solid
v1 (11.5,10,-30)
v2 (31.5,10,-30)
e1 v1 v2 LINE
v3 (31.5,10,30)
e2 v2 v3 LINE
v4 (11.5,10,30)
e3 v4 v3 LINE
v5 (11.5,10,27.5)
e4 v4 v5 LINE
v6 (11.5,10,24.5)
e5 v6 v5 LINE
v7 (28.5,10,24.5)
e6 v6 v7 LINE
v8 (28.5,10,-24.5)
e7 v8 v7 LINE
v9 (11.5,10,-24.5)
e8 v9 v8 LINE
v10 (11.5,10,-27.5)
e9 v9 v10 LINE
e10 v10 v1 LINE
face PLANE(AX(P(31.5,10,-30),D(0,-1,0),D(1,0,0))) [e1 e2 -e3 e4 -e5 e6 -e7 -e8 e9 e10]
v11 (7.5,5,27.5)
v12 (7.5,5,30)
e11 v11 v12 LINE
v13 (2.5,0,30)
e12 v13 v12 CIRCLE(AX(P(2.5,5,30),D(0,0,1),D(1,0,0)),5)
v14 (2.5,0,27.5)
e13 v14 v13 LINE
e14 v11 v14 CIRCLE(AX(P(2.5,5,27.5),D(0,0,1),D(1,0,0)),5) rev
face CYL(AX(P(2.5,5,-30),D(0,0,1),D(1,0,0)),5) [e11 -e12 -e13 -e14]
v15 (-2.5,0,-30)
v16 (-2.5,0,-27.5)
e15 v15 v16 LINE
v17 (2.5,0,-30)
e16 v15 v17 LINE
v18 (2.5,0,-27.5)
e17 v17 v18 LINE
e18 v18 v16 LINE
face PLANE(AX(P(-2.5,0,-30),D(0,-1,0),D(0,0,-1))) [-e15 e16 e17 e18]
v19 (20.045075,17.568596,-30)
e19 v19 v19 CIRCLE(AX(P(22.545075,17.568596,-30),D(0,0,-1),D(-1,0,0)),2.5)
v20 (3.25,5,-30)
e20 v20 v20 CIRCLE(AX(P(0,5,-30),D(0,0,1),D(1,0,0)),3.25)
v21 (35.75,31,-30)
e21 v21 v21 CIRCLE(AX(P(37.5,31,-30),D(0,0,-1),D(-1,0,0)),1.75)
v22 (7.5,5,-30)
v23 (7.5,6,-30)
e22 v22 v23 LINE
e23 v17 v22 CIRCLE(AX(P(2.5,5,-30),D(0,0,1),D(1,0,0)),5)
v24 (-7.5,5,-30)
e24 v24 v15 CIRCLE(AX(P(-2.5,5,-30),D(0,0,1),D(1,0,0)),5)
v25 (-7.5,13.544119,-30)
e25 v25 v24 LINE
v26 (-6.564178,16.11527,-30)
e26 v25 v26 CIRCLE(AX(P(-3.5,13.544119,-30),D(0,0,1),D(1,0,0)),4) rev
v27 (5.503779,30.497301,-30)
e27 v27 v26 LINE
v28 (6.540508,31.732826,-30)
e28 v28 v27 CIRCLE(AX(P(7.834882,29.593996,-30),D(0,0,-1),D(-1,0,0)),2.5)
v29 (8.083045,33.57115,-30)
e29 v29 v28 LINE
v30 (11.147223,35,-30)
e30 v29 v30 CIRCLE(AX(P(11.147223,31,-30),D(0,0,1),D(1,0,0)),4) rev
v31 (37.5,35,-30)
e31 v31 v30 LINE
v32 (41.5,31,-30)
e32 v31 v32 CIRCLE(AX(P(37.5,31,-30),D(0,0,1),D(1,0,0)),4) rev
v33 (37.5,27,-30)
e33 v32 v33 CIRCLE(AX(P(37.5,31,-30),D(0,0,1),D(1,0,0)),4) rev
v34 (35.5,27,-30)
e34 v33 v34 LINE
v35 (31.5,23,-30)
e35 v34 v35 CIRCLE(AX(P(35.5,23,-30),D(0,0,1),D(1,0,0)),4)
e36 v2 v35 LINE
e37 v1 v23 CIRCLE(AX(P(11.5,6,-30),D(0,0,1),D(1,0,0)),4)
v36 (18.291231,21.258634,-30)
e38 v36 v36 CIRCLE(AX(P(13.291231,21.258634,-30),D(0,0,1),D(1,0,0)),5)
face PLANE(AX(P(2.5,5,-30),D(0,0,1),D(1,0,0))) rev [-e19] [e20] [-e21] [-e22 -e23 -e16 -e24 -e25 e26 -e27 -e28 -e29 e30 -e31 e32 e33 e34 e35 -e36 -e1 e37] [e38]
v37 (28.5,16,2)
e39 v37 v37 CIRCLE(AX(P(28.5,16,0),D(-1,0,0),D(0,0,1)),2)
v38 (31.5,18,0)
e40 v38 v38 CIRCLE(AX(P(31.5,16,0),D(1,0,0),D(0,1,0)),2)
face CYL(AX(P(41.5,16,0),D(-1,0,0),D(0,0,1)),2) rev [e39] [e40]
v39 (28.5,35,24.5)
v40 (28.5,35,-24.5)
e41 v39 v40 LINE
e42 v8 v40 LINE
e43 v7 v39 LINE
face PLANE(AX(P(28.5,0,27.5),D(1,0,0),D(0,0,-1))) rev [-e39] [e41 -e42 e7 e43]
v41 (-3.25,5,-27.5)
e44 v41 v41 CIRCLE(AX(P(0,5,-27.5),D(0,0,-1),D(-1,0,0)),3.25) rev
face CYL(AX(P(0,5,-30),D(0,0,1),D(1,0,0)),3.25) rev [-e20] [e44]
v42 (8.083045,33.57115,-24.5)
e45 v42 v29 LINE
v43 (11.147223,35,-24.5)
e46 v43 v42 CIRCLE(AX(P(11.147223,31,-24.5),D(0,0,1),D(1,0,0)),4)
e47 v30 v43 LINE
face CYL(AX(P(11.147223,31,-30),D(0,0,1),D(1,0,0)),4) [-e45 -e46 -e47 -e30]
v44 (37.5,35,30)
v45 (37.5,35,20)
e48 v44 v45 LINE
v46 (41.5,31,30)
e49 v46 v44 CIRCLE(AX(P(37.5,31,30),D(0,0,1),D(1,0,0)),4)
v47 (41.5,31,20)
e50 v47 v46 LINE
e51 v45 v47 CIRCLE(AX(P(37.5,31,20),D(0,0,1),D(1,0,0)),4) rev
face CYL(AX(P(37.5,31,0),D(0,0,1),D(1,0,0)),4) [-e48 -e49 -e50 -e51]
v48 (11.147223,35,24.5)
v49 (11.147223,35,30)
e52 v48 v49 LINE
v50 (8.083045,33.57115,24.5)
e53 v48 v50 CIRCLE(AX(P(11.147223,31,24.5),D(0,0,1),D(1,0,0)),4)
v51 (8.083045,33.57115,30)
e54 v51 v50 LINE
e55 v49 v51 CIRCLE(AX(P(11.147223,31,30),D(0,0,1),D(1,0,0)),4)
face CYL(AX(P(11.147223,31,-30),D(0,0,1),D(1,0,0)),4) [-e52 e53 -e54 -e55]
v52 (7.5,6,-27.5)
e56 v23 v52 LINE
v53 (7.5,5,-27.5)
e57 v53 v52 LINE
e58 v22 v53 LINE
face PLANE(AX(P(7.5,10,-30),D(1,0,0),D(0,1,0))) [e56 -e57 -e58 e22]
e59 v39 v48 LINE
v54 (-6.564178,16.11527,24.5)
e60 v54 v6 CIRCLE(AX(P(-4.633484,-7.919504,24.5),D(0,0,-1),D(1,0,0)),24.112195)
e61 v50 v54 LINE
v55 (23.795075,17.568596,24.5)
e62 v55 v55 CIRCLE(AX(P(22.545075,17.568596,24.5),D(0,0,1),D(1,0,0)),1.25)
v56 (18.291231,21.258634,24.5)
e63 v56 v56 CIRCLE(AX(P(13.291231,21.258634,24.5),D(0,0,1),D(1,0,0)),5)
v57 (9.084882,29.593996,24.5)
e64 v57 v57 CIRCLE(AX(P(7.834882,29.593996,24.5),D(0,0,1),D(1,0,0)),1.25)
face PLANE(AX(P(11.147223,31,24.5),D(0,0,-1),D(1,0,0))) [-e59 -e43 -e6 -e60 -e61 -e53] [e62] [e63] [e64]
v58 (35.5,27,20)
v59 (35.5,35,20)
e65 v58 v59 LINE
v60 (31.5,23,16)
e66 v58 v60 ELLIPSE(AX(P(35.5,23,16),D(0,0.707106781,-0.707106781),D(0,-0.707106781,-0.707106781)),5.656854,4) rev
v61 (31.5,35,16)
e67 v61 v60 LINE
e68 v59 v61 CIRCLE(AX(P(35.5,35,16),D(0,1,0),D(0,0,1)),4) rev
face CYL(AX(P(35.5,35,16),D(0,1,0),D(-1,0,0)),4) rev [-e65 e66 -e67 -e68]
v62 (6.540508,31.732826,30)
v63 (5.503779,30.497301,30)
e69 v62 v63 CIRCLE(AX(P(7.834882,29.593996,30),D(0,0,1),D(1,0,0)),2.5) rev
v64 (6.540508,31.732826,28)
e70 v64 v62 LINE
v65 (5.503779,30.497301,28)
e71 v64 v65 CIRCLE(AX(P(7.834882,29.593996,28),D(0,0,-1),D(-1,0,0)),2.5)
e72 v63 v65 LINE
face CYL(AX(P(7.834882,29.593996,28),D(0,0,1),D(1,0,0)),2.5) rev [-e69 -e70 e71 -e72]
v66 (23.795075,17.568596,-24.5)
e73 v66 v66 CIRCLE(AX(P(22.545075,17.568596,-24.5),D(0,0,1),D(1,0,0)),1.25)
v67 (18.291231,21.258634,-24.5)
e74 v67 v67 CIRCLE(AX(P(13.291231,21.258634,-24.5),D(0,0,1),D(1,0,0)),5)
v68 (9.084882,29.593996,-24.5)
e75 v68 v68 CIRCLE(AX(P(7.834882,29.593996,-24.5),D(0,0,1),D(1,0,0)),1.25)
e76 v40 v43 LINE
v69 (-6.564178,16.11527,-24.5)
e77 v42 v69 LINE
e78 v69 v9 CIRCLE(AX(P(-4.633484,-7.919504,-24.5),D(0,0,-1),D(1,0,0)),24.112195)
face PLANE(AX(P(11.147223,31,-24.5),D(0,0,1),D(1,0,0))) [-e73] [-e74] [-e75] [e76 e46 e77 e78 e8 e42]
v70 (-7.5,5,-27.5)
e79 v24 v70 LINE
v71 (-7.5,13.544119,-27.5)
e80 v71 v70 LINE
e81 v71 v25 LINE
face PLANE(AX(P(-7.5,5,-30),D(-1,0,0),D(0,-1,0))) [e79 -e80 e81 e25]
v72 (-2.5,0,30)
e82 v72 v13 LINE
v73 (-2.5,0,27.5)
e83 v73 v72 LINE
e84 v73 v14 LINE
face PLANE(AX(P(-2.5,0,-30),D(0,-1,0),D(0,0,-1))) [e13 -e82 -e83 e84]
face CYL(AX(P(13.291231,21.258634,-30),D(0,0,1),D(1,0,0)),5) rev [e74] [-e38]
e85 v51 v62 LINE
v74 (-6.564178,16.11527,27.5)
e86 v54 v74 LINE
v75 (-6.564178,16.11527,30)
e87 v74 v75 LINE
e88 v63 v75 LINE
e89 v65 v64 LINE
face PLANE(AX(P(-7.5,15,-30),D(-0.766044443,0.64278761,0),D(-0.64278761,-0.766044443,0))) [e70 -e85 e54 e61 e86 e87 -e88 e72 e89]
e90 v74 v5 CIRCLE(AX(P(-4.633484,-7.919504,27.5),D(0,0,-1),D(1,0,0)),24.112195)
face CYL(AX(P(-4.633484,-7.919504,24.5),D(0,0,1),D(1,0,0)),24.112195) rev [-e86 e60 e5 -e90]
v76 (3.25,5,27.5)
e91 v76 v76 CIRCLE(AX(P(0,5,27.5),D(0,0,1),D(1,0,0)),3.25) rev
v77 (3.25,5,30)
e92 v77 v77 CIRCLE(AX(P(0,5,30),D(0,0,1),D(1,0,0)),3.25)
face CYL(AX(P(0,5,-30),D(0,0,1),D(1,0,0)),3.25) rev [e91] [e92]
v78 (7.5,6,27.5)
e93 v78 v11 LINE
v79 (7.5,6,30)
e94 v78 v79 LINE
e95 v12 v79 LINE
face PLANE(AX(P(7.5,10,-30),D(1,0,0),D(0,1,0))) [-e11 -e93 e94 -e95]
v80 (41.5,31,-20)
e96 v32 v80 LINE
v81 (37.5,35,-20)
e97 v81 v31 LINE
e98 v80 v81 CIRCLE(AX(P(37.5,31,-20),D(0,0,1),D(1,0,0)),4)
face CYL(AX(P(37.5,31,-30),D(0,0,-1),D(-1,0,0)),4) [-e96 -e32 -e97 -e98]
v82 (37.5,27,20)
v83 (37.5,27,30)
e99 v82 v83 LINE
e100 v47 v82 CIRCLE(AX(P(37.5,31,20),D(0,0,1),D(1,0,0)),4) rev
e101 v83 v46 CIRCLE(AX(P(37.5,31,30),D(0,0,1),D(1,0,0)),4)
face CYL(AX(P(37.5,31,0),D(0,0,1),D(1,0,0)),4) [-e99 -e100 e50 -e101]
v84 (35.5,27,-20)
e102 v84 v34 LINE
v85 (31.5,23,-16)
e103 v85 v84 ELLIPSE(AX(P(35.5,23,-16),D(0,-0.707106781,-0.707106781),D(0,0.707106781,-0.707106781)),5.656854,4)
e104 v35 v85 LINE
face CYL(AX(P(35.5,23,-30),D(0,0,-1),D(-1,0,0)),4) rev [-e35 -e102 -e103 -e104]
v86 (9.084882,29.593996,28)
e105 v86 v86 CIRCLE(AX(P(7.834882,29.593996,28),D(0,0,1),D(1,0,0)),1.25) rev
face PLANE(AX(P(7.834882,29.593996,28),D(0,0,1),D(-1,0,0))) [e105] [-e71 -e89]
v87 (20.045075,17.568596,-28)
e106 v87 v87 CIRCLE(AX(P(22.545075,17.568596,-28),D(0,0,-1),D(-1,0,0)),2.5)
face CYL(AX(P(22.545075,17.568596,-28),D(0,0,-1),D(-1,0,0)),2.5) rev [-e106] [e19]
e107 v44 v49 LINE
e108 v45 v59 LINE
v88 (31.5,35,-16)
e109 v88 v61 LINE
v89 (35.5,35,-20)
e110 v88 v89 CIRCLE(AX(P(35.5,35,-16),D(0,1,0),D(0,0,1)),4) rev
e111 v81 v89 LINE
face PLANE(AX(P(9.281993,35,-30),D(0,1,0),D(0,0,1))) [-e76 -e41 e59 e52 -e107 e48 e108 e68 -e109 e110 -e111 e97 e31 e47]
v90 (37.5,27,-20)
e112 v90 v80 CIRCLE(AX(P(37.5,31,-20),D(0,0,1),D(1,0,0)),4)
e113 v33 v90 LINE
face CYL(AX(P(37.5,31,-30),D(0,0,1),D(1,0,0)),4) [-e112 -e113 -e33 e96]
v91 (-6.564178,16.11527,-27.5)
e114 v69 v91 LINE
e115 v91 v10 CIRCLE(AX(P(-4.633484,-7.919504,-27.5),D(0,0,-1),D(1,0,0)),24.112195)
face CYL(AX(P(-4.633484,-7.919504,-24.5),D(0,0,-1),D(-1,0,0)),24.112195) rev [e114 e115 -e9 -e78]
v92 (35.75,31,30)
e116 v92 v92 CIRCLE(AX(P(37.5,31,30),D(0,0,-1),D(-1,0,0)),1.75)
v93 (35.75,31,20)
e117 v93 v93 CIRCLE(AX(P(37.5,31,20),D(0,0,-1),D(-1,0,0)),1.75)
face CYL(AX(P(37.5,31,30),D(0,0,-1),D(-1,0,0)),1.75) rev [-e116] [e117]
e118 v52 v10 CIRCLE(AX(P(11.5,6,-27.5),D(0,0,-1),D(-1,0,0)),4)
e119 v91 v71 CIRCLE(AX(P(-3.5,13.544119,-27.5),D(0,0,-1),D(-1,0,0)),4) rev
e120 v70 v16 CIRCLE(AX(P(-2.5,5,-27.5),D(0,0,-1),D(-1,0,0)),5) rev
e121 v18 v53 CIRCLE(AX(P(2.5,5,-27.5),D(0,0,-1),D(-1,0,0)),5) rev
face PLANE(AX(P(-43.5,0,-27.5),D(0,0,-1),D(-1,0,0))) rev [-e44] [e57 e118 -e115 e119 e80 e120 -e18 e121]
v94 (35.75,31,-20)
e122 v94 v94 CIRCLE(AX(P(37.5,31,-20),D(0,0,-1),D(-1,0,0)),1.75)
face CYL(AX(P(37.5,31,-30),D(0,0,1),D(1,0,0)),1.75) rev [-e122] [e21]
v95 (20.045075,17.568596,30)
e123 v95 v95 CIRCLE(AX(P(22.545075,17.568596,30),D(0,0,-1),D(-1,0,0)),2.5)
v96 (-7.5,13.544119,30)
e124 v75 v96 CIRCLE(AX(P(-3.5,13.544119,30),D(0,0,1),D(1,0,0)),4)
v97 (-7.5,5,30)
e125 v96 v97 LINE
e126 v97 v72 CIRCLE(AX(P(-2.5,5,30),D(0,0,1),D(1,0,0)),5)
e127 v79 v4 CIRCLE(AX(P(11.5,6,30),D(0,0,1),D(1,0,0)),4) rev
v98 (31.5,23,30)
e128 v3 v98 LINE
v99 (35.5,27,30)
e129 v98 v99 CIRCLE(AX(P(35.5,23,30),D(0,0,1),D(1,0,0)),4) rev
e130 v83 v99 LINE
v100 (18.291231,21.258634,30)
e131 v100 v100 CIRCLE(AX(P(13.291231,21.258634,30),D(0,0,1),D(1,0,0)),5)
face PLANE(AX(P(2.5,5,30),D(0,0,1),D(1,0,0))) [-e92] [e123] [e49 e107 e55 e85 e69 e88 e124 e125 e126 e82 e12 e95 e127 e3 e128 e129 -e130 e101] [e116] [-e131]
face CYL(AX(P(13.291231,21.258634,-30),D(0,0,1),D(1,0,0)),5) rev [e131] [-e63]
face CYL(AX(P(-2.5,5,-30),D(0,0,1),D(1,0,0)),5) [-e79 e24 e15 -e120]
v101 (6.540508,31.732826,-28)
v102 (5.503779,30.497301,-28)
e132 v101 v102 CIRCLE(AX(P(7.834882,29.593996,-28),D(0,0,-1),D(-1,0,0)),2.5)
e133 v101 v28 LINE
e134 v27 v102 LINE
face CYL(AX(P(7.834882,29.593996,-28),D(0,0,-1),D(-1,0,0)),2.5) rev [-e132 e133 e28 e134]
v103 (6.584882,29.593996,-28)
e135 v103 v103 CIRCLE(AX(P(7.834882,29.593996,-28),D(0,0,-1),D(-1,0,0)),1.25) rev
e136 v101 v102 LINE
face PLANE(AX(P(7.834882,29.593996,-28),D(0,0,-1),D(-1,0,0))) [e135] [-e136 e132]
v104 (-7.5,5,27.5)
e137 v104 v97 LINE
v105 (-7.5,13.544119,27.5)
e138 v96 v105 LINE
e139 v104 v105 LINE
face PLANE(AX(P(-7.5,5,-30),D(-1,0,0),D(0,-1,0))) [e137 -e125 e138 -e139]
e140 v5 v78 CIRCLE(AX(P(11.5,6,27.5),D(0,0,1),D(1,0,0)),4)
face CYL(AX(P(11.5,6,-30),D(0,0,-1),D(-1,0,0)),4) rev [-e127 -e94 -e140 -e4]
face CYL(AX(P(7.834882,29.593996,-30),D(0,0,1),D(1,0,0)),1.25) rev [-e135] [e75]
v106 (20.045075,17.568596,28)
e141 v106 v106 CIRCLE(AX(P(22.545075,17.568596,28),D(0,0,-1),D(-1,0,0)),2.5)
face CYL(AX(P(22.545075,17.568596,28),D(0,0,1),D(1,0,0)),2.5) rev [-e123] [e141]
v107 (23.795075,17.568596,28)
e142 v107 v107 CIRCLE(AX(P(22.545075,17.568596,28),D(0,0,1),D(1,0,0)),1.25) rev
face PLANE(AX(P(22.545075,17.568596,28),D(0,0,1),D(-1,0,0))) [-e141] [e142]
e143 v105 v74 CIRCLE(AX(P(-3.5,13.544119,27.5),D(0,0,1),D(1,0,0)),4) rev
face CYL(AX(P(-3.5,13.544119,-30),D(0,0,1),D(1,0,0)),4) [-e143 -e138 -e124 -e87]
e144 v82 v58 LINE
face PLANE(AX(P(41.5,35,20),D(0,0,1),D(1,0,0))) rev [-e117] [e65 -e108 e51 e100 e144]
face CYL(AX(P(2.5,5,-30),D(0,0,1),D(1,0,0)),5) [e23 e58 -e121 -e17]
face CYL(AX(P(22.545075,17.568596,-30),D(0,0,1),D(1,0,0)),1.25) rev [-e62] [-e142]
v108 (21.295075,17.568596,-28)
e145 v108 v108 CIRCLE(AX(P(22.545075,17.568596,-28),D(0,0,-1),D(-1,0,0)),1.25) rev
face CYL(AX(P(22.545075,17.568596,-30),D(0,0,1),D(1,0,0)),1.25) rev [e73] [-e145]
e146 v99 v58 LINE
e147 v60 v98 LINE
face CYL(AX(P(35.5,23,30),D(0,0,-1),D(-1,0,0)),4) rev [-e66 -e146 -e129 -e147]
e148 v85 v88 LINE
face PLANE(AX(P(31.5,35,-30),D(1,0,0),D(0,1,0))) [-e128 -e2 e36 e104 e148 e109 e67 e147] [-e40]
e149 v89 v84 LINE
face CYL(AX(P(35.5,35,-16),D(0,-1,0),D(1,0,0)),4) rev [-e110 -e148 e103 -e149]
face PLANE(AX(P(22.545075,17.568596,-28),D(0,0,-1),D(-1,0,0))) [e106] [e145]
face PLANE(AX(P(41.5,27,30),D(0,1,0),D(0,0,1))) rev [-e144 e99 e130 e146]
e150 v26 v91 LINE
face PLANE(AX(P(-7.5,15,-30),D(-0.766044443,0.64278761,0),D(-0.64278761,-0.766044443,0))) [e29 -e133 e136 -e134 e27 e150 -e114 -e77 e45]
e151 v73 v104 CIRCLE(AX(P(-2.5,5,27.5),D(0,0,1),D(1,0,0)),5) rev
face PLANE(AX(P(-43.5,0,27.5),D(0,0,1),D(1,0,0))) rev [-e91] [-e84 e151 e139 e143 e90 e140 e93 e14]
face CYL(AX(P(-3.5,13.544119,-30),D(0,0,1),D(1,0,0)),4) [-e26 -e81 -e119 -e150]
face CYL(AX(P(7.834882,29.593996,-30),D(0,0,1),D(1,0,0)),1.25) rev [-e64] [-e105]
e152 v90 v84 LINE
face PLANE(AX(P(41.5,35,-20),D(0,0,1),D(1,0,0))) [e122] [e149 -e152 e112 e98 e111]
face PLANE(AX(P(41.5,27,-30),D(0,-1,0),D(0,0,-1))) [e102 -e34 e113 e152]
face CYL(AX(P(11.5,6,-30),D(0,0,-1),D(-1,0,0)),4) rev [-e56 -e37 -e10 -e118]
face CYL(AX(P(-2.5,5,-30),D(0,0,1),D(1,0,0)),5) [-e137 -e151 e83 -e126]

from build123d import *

# Parameters (mm, degrees)
BOSS_EXTRUDE1_DEPTH      = 30
BOSS_EXTRUDE1_DEPTH_BACK = 30
SKETCH2_R                = 3.25
SKETCH2_R_2              = 1.25
SKETCH2_R_3              = 5
SKETCH3_W                = 72
SKETCH3_H                = 55
CUT_EXTRUDE1_DEPTH       = 56.8323383
SKETCH4_W                = 10
SKETCH4_H                = 8
BOSS_EXTRUDE2_DEPTH      = 10
FILLET1_R                = 4
SKETCH5_R                = 1.75
CUT_EXTRUDE2_DEPTH       = 74.805487601
FILLET1_OF_MIRROR1_R     = 4
FILLET2_R                = 4
SKETCH6_R                = 1.25
SKETCH6_R_2              = 5
BOSS_EXTRUDE3_DEPTH      = 3
SKETCH7_R                = 2.5
CUT_EXTRUDE3_DEPTH       = 2
SKETCH8_R                = 2
CUT_EXTRUDE4_DEPTH       = 59.489315264


with BuildPart() as part:
    # Sketch2 → Boss-Extrude1 (new, two sides: drawn at the far end of the back side and taken through both)
    with BuildSketch(Plane.XY.offset(-BOSS_EXTRUDE1_DEPTH_BACK)):
        with BuildLine():
            Line((-7.5, 5), (-7.5, 15))
            Line((-7.5, 15), (9.281992624, 35))
            Line((9.281992624, 35), (31.5, 35))
            Line((31.5, 35), (31.5, 10))
            Line((31.5, 10), (7.5, 10))
            Line((7.5, 10), (7.5, 5))
            ThreePointArc((7.5, 5), (6.035533906, 1.464466094), (2.5, 0))
            Line((2.5, 0), (-2.5, 0))
            ThreePointArc((-2.5, 0), (-6.035533906, 1.464466094), (-7.5, 5))
        make_face()
        with Locations((0, 5)):
            Circle(SKETCH2_R, mode=Mode.SUBTRACT)
        with Locations((22.545074696, 17.568596061)):
            Circle(SKETCH2_R_2, mode=Mode.SUBTRACT)
        with Locations((7.834882147, 29.593995644)):
            Circle(SKETCH2_R_2, mode=Mode.SUBTRACT)
        with Locations((13.291231119, 21.258633871)):
            Circle(SKETCH2_R_3, mode=Mode.SUBTRACT)
    extrude(amount=BOSS_EXTRUDE1_DEPTH + BOSS_EXTRUDE1_DEPTH_BACK)

    # Sketch3 → Cut-Extrude1 (cut, through all)
    with BuildSketch(Plane(origin=(0, 35, 0), x_dir=(1, 0, 0), z_dir=(0, 1, 0))):
        with Locations((-7.5, 0)):
            Rectangle(SKETCH3_W, SKETCH3_H)
    extrude(amount=-CUT_EXTRUDE1_DEPTH, mode=Mode.SUBTRACT)

    # Sketch4 → Boss-Extrude2 (add)
    with BuildSketch(Plane(origin=(31.5, 0, 0), x_dir=(0, 0, -1), z_dir=(1, 0, 0))):
        with Locations((-25, 31)):
            Rectangle(SKETCH4_W, SKETCH4_H)
    boss_extrude2 = extrude(amount=BOSS_EXTRUDE2_DEPTH)

    # Fillet1
    fillet1_edges = [part.edges().sort_by_distance(p)[0] for p in [
        (41.5, 27, 25),
        (41.5, 35, 25),
    ]]
    fillet(fillet1_edges, radius=FILLET1_R - 0.0001)  # a hair under: the kernel refuses the full size

    # Sketch5 → Cut-Extrude2 (cut, through all)
    with BuildSketch(Plane(origin=(0, 0, 20), x_dir=(-1, 0, 0), z_dir=(0, 0, -1))):
        with Locations((-37.5, 31)):
            Circle(SKETCH5_R)
    cut_extrude2 = extrude(amount=-CUT_EXTRUDE2_DEPTH, mode=Mode.SUBTRACT)

    # Mirror1: Boss-Extrude2, Cut-Extrude2 across plane
    add(boss_extrude2.mirror(Plane.XY))
    add(cut_extrude2.mirror(Plane.XY), mode=Mode.SUBTRACT)

    # Fillet1 of Mirror1
    fillet1_of_mirror1_edges = [part.edges().sort_by_distance(p)[0] for p in [
        (41.5, 27, -25),
        (41.5, 35, -25),
    ]]
    fillet(fillet1_of_mirror1_edges, radius=FILLET1_OF_MIRROR1_R - 0.0001)  # a hair under: the kernel refuses the full size

    # Fillet2
    fillet2_edges = [part.edges().sort_by_distance(p)[0] for p in [
        (31.5, 27, 25),
        (31.5, 31, 20),
        (31.5, 27, -25),
        (31.5, 31, -20),
        (9.281992624, 35, -28.75),
        (7.5, 10, -28.75),
        (-7.5, 15, -28.75),
        (-7.5, 15, 28.75),
        (7.5, 10, 28.75),
        (9.281992624, 35, 28.75),
    ]]
    fillet(fillet2_edges, radius=FILLET2_R)

    # Sketch6 → Boss-Extrude3 (add)
    with BuildSketch(Plane.XY.offset(-27.5)):
        with BuildLine():
            Line((28.5, 35), (11.147223256, 35))
            ThreePointArc((11.147223256, 35), (9.456750209, 34.625231148), (8.083045484, 33.571150439))
            Line((8.083045484, 33.571150439), (-6.564177772, 16.115269502))
            ThreePointArc((-6.564177772, 16.115269502), (3.098200373, 14.919475381), (11.5, 10))
            Line((11.5, 10), (28.5, 10))
            Line((28.5, 10), (28.5, 35))
        make_face()
        with Locations((22.545074696, 17.568596061)):
            Circle(SKETCH6_R, mode=Mode.SUBTRACT)
        with Locations((13.291231119, 21.258633871)):
            Circle(SKETCH6_R_2, mode=Mode.SUBTRACT)
        with Locations((7.834882147, 29.593995644)):
            Circle(SKETCH6_R, mode=Mode.SUBTRACT)
    boss_extrude3 = extrude(amount=BOSS_EXTRUDE3_DEPTH)

    # Sketch7 → Cut-Extrude3 (cut)
    with BuildSketch(Plane(origin=(0, 0, -30), x_dir=(-1, 0, 0), z_dir=(0, 0, -1))):
        with Locations((-22.545074696, 17.568596061)):
            Circle(SKETCH7_R)
        with Locations((-7.834882147, 29.593995644)):
            Circle(SKETCH7_R)
    cut_extrude3 = extrude(amount=-CUT_EXTRUDE3_DEPTH, mode=Mode.SUBTRACT)

    # Mirror2: Boss-Extrude3, Cut-Extrude3 across plane
    add(boss_extrude3.mirror(Plane.XY))
    add(cut_extrude3.mirror(Plane.XY), mode=Mode.SUBTRACT)

    # Sketch8 → Cut-Extrude4 (cut, through all)
    with BuildSketch(Plane.ZY.offset(-28.5)):
        with Locations((0, 16)):
            Circle(SKETCH8_R)
    extrude(amount=-CUT_EXTRUDE4_DEPTH, mode=Mode.SUBTRACT)


solid = part.part
